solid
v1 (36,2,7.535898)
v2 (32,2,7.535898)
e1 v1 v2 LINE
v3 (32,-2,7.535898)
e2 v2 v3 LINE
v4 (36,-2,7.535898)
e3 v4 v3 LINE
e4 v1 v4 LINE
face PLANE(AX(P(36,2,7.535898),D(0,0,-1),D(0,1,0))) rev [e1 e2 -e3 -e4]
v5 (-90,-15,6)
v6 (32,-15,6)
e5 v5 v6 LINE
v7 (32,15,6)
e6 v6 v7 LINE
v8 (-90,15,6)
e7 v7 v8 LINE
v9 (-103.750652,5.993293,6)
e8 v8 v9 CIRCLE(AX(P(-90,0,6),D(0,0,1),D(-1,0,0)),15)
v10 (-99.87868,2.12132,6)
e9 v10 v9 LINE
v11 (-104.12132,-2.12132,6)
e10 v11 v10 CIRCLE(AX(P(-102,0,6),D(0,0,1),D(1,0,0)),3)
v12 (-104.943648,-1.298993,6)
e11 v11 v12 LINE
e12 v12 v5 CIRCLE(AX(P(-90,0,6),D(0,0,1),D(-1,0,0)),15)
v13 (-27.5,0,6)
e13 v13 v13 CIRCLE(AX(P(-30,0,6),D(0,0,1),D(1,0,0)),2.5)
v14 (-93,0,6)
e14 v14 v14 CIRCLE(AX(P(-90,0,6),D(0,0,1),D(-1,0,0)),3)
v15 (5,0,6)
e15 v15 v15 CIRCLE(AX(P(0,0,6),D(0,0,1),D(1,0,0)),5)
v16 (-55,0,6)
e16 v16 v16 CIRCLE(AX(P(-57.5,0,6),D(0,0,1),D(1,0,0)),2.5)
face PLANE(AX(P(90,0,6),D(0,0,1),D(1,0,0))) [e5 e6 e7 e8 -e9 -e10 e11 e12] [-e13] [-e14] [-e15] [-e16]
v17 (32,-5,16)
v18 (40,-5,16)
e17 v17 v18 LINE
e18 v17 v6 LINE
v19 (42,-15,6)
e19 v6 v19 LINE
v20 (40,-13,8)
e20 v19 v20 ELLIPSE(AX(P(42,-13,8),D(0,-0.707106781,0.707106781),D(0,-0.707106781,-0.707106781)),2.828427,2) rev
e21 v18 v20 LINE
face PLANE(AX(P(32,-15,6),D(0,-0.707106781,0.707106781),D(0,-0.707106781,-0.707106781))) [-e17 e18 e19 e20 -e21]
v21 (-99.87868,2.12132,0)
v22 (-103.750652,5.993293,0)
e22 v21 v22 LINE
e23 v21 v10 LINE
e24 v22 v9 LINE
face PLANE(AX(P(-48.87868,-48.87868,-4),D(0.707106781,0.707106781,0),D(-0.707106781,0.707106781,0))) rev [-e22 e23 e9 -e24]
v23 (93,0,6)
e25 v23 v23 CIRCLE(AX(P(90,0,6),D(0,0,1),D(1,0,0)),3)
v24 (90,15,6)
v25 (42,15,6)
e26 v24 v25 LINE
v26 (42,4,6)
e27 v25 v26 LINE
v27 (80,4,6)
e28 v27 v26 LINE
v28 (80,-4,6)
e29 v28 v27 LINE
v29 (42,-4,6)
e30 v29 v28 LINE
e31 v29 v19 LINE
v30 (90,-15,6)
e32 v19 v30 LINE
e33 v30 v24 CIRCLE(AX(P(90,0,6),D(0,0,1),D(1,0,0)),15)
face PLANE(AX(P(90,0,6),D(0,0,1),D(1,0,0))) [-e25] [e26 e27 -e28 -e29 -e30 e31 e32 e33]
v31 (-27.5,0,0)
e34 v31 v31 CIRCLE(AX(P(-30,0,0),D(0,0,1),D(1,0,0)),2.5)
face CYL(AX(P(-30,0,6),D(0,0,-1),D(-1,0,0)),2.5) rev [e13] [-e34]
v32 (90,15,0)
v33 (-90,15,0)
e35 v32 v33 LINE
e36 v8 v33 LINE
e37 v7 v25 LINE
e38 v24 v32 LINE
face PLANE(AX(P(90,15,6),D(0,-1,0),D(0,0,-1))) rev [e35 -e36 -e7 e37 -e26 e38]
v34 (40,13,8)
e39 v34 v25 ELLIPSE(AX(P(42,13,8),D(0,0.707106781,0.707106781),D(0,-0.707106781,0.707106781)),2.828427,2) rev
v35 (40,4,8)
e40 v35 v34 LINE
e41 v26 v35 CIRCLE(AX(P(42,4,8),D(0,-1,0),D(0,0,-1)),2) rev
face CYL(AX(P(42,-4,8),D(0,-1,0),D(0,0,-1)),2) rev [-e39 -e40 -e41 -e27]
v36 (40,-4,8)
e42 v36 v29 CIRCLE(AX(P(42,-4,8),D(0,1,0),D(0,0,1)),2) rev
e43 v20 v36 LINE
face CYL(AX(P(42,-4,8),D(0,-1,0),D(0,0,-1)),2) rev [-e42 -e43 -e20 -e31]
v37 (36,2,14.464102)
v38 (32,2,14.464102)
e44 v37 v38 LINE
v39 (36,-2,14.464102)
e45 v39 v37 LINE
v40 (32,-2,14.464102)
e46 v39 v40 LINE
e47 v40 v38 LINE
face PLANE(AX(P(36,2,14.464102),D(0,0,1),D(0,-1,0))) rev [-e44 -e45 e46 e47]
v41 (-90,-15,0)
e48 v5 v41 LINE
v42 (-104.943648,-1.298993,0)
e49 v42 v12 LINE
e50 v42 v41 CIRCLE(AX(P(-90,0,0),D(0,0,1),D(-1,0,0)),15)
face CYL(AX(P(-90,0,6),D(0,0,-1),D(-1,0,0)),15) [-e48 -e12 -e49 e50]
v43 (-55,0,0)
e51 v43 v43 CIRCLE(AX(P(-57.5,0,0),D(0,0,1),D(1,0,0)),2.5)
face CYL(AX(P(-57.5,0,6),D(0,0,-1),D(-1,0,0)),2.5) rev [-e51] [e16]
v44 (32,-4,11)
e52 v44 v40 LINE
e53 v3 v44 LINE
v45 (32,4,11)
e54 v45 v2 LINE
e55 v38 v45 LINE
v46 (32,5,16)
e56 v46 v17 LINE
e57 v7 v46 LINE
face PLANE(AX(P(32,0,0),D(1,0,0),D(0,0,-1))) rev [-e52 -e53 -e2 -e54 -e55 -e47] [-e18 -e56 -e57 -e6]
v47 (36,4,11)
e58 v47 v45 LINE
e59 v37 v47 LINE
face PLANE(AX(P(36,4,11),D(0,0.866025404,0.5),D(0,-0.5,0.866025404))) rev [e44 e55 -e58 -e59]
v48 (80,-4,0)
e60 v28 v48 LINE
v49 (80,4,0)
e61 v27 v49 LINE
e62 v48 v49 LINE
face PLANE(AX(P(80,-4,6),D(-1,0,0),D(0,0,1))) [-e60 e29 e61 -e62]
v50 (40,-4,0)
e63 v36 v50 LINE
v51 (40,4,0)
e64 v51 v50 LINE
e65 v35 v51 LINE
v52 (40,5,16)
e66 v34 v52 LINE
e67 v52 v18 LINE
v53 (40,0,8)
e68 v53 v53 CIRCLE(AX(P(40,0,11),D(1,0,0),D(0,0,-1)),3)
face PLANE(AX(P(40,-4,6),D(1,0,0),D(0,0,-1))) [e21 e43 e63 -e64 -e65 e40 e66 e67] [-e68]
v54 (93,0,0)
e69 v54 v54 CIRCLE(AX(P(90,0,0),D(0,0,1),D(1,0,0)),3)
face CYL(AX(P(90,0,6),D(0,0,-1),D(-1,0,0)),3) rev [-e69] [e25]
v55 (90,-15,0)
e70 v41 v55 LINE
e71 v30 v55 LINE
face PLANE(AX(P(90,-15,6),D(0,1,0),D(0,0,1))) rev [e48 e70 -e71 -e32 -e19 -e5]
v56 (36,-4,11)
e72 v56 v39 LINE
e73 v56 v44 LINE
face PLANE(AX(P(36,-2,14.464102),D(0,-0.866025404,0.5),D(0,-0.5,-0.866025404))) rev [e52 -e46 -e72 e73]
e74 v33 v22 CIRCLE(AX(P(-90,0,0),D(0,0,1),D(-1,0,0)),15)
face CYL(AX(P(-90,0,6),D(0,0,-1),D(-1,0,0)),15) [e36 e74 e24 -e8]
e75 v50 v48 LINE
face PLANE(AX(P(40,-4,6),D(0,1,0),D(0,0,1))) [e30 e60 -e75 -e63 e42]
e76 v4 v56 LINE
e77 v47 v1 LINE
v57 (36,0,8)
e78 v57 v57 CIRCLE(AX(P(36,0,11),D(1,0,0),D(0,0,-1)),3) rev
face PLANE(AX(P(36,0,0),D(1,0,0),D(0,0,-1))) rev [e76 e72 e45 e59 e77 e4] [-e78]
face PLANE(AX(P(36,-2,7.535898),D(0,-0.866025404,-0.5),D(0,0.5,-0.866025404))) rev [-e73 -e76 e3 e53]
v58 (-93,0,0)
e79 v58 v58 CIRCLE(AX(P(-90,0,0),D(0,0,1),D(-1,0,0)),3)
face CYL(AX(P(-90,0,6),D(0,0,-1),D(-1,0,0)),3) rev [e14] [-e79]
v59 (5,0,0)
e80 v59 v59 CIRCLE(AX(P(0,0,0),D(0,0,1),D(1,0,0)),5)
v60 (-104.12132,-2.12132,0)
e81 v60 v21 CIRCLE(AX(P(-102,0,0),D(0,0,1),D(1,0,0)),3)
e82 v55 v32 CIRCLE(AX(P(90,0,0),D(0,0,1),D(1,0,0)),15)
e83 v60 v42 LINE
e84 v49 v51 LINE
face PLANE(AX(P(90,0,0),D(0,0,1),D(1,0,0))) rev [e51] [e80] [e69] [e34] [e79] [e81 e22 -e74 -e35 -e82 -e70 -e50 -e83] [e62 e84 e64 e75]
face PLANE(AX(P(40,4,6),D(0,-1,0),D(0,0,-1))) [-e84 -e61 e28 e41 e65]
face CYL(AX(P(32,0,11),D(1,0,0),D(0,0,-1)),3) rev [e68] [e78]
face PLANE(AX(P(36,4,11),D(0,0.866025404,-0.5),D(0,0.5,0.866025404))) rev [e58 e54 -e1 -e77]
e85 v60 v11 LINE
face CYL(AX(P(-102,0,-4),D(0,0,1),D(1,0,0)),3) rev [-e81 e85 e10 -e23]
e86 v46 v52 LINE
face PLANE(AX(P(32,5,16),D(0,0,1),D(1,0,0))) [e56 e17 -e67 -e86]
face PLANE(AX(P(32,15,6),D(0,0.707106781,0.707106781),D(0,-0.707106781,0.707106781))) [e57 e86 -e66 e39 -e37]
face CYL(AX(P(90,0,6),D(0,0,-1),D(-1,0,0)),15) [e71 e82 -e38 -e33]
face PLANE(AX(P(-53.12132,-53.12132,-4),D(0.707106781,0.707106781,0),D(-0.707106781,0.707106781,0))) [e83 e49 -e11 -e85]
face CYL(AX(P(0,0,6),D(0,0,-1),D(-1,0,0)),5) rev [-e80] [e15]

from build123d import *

# Parameters (mm, degrees)
ESQUISSE1_R             = 3
ESQUISSE1_R_2           = 5
ESQUISSE1_R_3           = 2.5
ESQUISSE1_W             = 40
ESQUISSE1_H             = 8
BOSS_EXTRU_1_DEPTH      = 6
ESQUISSE2_R             = 3
BOSS_EXTRU_2_DEPTH      = 8
CONG_2_R                = 2
ENL_V_MAT_EXTRU_1_DEPTH = 4
ENL_V_START             = -10
ENL_V_MAT_EXTRU_4_DEPTH = 10


with BuildPart() as part:
    # Esquisse1 → Boss.-Extru.1 (new body)
    with BuildSketch(Plane.XY):
        with BuildLine():
            Line((90, -15), (-90, -15))
            ThreePointArc((-90, -15), (-105, 0), (-90, 15))
            Line((-90, 15), (90, 15))
            ThreePointArc((90, 15), (105, 0), (90, -15))
        make_face()
        with Locations((90, 0)):
            Circle(ESQUISSE1_R, mode=Mode.SUBTRACT)
        with Locations(Location((-90, 0, 0), (0, 0, 180))):
            Circle(ESQUISSE1_R, mode=Mode.SUBTRACT)
        Circle(ESQUISSE1_R_2, mode=Mode.SUBTRACT)
        with Locations((-57.5, 0)):
            Circle(ESQUISSE1_R_3, mode=Mode.SUBTRACT)
        with Locations((-30, 0)):
            Circle(ESQUISSE1_R_3, mode=Mode.SUBTRACT)
        with Locations((60, 0)):
            Rectangle(ESQUISSE1_W, ESQUISSE1_H, mode=Mode.SUBTRACT)
    extrude(amount=BOSS_EXTRU_1_DEPTH)

    # Esquisse2 → Boss.-Extru.2 (add)
    with BuildSketch(Plane(origin=(40, 0, 0), x_dir=(0, 0, -1), z_dir=(1, 0, 0))):
        Polygon((-16, 5), (-16, -5), (-6, -15), (-6, -5), (-6, 5), (-6, 15), align=None)
        with Locations((-11, 0)):
            Circle(ESQUISSE2_R, mode=Mode.SUBTRACT)
    extrude(amount=-BOSS_EXTRU_2_DEPTH)

    # Congé2
    cong_2_edges = [part.edges().sort_by_distance(p)[0] for p in [
        (40, 9.5, 6),
        (40, -9.5, 6),
    ]]
    fillet(cong_2_edges, radius=CONG_2_R - 0.0001)  # a hair under: the kernel refuses the full size

    # Esquisse3 → Enlèv. mat.-Extru.1 (cut)
    with BuildSketch(Plane.ZY.offset(-32)):
        Polygon((11, 4), (14.464101615, 2), (14.464101615, -2), (11, -4), (7.535898385, -2), (7.535898385, 2), align=None)
    extrude(amount=-ENL_V_MAT_EXTRU_1_DEPTH, mode=Mode.SUBTRACT)

    # Esquisse4 → Enlèv. mat.-Extru.4 (cut)
    with BuildSketch(Plane.XY.offset(6).offset(ENL_V_START)):
        with BuildLine():
            ThreePointArc((-105, 0), (-104.771638598, -1.148050297), (-104.121320344, -2.121320344))
            Line((-104.121320344, -2.121320344), (-99.878679656, 2.121320344))
            ThreePointArc((-99.878679656, 2.121320344), (-103.148050297, 2.771638598), (-105, 0))
        make_face()
        with BuildLine():
            Line((-99.878679656, 2.121320344), (-104.121320344, -2.121320344))
            ThreePointArc((-104.121320344, -2.121320344), (-100.851949703, -2.771638598), (-99, 0))
            ThreePointArc((-99, 0), (-99.228361402, 1.148050297), (-99.878679656, 2.121320344))
        make_face()
        with BuildLine():
            ThreePointArc((-105, 0), (-103.148050297, 2.771638598), (-99.878679656, 2.121320344))
            Line((-99.878679656, 2.121320344), (-103.750652313, 5.993293))
            ThreePointArc((-103.750652313, 5.993293), (-104.68434174, 3.061063158), (-105, 0))
        make_face()
        with BuildLine():
            Line((-104.94364809, -1.298992597), (-104.121320344, -2.121320344))
            ThreePointArc((-104.121320344, -2.121320344), (-104.771638598, -1.148050297), (-105, 0))
            ThreePointArc((-105, 0), (-104.985905401, -0.650107165), (-104.94364809, -1.298992597))
        make_face()
        with BuildLine():
            ThreePointArc((-105, 0), (-104.771638598, -1.148050297), (-104.121320344, -2.121320344))
            Line((-104.121320344, -2.121320344), (-99.878679656, 2.121320344))
            ThreePointArc((-99.878679656, 2.121320344), (-103.148050297, 2.771638598), (-105, 0))
        make_face()
        with BuildLine():
            Line((-99.878679656, 2.121320344), (-104.121320344, -2.121320344))
            ThreePointArc((-104.121320344, -2.121320344), (-100.851949703, -2.771638598), (-99, 0))
            ThreePointArc((-99, 0), (-99.228361402, 1.148050297), (-99.878679656, 2.121320344))
        make_face()
    extrude(amount=ENL_V_MAT_EXTRU_4_DEPTH, mode=Mode.SUBTRACT)


solid = part.part
